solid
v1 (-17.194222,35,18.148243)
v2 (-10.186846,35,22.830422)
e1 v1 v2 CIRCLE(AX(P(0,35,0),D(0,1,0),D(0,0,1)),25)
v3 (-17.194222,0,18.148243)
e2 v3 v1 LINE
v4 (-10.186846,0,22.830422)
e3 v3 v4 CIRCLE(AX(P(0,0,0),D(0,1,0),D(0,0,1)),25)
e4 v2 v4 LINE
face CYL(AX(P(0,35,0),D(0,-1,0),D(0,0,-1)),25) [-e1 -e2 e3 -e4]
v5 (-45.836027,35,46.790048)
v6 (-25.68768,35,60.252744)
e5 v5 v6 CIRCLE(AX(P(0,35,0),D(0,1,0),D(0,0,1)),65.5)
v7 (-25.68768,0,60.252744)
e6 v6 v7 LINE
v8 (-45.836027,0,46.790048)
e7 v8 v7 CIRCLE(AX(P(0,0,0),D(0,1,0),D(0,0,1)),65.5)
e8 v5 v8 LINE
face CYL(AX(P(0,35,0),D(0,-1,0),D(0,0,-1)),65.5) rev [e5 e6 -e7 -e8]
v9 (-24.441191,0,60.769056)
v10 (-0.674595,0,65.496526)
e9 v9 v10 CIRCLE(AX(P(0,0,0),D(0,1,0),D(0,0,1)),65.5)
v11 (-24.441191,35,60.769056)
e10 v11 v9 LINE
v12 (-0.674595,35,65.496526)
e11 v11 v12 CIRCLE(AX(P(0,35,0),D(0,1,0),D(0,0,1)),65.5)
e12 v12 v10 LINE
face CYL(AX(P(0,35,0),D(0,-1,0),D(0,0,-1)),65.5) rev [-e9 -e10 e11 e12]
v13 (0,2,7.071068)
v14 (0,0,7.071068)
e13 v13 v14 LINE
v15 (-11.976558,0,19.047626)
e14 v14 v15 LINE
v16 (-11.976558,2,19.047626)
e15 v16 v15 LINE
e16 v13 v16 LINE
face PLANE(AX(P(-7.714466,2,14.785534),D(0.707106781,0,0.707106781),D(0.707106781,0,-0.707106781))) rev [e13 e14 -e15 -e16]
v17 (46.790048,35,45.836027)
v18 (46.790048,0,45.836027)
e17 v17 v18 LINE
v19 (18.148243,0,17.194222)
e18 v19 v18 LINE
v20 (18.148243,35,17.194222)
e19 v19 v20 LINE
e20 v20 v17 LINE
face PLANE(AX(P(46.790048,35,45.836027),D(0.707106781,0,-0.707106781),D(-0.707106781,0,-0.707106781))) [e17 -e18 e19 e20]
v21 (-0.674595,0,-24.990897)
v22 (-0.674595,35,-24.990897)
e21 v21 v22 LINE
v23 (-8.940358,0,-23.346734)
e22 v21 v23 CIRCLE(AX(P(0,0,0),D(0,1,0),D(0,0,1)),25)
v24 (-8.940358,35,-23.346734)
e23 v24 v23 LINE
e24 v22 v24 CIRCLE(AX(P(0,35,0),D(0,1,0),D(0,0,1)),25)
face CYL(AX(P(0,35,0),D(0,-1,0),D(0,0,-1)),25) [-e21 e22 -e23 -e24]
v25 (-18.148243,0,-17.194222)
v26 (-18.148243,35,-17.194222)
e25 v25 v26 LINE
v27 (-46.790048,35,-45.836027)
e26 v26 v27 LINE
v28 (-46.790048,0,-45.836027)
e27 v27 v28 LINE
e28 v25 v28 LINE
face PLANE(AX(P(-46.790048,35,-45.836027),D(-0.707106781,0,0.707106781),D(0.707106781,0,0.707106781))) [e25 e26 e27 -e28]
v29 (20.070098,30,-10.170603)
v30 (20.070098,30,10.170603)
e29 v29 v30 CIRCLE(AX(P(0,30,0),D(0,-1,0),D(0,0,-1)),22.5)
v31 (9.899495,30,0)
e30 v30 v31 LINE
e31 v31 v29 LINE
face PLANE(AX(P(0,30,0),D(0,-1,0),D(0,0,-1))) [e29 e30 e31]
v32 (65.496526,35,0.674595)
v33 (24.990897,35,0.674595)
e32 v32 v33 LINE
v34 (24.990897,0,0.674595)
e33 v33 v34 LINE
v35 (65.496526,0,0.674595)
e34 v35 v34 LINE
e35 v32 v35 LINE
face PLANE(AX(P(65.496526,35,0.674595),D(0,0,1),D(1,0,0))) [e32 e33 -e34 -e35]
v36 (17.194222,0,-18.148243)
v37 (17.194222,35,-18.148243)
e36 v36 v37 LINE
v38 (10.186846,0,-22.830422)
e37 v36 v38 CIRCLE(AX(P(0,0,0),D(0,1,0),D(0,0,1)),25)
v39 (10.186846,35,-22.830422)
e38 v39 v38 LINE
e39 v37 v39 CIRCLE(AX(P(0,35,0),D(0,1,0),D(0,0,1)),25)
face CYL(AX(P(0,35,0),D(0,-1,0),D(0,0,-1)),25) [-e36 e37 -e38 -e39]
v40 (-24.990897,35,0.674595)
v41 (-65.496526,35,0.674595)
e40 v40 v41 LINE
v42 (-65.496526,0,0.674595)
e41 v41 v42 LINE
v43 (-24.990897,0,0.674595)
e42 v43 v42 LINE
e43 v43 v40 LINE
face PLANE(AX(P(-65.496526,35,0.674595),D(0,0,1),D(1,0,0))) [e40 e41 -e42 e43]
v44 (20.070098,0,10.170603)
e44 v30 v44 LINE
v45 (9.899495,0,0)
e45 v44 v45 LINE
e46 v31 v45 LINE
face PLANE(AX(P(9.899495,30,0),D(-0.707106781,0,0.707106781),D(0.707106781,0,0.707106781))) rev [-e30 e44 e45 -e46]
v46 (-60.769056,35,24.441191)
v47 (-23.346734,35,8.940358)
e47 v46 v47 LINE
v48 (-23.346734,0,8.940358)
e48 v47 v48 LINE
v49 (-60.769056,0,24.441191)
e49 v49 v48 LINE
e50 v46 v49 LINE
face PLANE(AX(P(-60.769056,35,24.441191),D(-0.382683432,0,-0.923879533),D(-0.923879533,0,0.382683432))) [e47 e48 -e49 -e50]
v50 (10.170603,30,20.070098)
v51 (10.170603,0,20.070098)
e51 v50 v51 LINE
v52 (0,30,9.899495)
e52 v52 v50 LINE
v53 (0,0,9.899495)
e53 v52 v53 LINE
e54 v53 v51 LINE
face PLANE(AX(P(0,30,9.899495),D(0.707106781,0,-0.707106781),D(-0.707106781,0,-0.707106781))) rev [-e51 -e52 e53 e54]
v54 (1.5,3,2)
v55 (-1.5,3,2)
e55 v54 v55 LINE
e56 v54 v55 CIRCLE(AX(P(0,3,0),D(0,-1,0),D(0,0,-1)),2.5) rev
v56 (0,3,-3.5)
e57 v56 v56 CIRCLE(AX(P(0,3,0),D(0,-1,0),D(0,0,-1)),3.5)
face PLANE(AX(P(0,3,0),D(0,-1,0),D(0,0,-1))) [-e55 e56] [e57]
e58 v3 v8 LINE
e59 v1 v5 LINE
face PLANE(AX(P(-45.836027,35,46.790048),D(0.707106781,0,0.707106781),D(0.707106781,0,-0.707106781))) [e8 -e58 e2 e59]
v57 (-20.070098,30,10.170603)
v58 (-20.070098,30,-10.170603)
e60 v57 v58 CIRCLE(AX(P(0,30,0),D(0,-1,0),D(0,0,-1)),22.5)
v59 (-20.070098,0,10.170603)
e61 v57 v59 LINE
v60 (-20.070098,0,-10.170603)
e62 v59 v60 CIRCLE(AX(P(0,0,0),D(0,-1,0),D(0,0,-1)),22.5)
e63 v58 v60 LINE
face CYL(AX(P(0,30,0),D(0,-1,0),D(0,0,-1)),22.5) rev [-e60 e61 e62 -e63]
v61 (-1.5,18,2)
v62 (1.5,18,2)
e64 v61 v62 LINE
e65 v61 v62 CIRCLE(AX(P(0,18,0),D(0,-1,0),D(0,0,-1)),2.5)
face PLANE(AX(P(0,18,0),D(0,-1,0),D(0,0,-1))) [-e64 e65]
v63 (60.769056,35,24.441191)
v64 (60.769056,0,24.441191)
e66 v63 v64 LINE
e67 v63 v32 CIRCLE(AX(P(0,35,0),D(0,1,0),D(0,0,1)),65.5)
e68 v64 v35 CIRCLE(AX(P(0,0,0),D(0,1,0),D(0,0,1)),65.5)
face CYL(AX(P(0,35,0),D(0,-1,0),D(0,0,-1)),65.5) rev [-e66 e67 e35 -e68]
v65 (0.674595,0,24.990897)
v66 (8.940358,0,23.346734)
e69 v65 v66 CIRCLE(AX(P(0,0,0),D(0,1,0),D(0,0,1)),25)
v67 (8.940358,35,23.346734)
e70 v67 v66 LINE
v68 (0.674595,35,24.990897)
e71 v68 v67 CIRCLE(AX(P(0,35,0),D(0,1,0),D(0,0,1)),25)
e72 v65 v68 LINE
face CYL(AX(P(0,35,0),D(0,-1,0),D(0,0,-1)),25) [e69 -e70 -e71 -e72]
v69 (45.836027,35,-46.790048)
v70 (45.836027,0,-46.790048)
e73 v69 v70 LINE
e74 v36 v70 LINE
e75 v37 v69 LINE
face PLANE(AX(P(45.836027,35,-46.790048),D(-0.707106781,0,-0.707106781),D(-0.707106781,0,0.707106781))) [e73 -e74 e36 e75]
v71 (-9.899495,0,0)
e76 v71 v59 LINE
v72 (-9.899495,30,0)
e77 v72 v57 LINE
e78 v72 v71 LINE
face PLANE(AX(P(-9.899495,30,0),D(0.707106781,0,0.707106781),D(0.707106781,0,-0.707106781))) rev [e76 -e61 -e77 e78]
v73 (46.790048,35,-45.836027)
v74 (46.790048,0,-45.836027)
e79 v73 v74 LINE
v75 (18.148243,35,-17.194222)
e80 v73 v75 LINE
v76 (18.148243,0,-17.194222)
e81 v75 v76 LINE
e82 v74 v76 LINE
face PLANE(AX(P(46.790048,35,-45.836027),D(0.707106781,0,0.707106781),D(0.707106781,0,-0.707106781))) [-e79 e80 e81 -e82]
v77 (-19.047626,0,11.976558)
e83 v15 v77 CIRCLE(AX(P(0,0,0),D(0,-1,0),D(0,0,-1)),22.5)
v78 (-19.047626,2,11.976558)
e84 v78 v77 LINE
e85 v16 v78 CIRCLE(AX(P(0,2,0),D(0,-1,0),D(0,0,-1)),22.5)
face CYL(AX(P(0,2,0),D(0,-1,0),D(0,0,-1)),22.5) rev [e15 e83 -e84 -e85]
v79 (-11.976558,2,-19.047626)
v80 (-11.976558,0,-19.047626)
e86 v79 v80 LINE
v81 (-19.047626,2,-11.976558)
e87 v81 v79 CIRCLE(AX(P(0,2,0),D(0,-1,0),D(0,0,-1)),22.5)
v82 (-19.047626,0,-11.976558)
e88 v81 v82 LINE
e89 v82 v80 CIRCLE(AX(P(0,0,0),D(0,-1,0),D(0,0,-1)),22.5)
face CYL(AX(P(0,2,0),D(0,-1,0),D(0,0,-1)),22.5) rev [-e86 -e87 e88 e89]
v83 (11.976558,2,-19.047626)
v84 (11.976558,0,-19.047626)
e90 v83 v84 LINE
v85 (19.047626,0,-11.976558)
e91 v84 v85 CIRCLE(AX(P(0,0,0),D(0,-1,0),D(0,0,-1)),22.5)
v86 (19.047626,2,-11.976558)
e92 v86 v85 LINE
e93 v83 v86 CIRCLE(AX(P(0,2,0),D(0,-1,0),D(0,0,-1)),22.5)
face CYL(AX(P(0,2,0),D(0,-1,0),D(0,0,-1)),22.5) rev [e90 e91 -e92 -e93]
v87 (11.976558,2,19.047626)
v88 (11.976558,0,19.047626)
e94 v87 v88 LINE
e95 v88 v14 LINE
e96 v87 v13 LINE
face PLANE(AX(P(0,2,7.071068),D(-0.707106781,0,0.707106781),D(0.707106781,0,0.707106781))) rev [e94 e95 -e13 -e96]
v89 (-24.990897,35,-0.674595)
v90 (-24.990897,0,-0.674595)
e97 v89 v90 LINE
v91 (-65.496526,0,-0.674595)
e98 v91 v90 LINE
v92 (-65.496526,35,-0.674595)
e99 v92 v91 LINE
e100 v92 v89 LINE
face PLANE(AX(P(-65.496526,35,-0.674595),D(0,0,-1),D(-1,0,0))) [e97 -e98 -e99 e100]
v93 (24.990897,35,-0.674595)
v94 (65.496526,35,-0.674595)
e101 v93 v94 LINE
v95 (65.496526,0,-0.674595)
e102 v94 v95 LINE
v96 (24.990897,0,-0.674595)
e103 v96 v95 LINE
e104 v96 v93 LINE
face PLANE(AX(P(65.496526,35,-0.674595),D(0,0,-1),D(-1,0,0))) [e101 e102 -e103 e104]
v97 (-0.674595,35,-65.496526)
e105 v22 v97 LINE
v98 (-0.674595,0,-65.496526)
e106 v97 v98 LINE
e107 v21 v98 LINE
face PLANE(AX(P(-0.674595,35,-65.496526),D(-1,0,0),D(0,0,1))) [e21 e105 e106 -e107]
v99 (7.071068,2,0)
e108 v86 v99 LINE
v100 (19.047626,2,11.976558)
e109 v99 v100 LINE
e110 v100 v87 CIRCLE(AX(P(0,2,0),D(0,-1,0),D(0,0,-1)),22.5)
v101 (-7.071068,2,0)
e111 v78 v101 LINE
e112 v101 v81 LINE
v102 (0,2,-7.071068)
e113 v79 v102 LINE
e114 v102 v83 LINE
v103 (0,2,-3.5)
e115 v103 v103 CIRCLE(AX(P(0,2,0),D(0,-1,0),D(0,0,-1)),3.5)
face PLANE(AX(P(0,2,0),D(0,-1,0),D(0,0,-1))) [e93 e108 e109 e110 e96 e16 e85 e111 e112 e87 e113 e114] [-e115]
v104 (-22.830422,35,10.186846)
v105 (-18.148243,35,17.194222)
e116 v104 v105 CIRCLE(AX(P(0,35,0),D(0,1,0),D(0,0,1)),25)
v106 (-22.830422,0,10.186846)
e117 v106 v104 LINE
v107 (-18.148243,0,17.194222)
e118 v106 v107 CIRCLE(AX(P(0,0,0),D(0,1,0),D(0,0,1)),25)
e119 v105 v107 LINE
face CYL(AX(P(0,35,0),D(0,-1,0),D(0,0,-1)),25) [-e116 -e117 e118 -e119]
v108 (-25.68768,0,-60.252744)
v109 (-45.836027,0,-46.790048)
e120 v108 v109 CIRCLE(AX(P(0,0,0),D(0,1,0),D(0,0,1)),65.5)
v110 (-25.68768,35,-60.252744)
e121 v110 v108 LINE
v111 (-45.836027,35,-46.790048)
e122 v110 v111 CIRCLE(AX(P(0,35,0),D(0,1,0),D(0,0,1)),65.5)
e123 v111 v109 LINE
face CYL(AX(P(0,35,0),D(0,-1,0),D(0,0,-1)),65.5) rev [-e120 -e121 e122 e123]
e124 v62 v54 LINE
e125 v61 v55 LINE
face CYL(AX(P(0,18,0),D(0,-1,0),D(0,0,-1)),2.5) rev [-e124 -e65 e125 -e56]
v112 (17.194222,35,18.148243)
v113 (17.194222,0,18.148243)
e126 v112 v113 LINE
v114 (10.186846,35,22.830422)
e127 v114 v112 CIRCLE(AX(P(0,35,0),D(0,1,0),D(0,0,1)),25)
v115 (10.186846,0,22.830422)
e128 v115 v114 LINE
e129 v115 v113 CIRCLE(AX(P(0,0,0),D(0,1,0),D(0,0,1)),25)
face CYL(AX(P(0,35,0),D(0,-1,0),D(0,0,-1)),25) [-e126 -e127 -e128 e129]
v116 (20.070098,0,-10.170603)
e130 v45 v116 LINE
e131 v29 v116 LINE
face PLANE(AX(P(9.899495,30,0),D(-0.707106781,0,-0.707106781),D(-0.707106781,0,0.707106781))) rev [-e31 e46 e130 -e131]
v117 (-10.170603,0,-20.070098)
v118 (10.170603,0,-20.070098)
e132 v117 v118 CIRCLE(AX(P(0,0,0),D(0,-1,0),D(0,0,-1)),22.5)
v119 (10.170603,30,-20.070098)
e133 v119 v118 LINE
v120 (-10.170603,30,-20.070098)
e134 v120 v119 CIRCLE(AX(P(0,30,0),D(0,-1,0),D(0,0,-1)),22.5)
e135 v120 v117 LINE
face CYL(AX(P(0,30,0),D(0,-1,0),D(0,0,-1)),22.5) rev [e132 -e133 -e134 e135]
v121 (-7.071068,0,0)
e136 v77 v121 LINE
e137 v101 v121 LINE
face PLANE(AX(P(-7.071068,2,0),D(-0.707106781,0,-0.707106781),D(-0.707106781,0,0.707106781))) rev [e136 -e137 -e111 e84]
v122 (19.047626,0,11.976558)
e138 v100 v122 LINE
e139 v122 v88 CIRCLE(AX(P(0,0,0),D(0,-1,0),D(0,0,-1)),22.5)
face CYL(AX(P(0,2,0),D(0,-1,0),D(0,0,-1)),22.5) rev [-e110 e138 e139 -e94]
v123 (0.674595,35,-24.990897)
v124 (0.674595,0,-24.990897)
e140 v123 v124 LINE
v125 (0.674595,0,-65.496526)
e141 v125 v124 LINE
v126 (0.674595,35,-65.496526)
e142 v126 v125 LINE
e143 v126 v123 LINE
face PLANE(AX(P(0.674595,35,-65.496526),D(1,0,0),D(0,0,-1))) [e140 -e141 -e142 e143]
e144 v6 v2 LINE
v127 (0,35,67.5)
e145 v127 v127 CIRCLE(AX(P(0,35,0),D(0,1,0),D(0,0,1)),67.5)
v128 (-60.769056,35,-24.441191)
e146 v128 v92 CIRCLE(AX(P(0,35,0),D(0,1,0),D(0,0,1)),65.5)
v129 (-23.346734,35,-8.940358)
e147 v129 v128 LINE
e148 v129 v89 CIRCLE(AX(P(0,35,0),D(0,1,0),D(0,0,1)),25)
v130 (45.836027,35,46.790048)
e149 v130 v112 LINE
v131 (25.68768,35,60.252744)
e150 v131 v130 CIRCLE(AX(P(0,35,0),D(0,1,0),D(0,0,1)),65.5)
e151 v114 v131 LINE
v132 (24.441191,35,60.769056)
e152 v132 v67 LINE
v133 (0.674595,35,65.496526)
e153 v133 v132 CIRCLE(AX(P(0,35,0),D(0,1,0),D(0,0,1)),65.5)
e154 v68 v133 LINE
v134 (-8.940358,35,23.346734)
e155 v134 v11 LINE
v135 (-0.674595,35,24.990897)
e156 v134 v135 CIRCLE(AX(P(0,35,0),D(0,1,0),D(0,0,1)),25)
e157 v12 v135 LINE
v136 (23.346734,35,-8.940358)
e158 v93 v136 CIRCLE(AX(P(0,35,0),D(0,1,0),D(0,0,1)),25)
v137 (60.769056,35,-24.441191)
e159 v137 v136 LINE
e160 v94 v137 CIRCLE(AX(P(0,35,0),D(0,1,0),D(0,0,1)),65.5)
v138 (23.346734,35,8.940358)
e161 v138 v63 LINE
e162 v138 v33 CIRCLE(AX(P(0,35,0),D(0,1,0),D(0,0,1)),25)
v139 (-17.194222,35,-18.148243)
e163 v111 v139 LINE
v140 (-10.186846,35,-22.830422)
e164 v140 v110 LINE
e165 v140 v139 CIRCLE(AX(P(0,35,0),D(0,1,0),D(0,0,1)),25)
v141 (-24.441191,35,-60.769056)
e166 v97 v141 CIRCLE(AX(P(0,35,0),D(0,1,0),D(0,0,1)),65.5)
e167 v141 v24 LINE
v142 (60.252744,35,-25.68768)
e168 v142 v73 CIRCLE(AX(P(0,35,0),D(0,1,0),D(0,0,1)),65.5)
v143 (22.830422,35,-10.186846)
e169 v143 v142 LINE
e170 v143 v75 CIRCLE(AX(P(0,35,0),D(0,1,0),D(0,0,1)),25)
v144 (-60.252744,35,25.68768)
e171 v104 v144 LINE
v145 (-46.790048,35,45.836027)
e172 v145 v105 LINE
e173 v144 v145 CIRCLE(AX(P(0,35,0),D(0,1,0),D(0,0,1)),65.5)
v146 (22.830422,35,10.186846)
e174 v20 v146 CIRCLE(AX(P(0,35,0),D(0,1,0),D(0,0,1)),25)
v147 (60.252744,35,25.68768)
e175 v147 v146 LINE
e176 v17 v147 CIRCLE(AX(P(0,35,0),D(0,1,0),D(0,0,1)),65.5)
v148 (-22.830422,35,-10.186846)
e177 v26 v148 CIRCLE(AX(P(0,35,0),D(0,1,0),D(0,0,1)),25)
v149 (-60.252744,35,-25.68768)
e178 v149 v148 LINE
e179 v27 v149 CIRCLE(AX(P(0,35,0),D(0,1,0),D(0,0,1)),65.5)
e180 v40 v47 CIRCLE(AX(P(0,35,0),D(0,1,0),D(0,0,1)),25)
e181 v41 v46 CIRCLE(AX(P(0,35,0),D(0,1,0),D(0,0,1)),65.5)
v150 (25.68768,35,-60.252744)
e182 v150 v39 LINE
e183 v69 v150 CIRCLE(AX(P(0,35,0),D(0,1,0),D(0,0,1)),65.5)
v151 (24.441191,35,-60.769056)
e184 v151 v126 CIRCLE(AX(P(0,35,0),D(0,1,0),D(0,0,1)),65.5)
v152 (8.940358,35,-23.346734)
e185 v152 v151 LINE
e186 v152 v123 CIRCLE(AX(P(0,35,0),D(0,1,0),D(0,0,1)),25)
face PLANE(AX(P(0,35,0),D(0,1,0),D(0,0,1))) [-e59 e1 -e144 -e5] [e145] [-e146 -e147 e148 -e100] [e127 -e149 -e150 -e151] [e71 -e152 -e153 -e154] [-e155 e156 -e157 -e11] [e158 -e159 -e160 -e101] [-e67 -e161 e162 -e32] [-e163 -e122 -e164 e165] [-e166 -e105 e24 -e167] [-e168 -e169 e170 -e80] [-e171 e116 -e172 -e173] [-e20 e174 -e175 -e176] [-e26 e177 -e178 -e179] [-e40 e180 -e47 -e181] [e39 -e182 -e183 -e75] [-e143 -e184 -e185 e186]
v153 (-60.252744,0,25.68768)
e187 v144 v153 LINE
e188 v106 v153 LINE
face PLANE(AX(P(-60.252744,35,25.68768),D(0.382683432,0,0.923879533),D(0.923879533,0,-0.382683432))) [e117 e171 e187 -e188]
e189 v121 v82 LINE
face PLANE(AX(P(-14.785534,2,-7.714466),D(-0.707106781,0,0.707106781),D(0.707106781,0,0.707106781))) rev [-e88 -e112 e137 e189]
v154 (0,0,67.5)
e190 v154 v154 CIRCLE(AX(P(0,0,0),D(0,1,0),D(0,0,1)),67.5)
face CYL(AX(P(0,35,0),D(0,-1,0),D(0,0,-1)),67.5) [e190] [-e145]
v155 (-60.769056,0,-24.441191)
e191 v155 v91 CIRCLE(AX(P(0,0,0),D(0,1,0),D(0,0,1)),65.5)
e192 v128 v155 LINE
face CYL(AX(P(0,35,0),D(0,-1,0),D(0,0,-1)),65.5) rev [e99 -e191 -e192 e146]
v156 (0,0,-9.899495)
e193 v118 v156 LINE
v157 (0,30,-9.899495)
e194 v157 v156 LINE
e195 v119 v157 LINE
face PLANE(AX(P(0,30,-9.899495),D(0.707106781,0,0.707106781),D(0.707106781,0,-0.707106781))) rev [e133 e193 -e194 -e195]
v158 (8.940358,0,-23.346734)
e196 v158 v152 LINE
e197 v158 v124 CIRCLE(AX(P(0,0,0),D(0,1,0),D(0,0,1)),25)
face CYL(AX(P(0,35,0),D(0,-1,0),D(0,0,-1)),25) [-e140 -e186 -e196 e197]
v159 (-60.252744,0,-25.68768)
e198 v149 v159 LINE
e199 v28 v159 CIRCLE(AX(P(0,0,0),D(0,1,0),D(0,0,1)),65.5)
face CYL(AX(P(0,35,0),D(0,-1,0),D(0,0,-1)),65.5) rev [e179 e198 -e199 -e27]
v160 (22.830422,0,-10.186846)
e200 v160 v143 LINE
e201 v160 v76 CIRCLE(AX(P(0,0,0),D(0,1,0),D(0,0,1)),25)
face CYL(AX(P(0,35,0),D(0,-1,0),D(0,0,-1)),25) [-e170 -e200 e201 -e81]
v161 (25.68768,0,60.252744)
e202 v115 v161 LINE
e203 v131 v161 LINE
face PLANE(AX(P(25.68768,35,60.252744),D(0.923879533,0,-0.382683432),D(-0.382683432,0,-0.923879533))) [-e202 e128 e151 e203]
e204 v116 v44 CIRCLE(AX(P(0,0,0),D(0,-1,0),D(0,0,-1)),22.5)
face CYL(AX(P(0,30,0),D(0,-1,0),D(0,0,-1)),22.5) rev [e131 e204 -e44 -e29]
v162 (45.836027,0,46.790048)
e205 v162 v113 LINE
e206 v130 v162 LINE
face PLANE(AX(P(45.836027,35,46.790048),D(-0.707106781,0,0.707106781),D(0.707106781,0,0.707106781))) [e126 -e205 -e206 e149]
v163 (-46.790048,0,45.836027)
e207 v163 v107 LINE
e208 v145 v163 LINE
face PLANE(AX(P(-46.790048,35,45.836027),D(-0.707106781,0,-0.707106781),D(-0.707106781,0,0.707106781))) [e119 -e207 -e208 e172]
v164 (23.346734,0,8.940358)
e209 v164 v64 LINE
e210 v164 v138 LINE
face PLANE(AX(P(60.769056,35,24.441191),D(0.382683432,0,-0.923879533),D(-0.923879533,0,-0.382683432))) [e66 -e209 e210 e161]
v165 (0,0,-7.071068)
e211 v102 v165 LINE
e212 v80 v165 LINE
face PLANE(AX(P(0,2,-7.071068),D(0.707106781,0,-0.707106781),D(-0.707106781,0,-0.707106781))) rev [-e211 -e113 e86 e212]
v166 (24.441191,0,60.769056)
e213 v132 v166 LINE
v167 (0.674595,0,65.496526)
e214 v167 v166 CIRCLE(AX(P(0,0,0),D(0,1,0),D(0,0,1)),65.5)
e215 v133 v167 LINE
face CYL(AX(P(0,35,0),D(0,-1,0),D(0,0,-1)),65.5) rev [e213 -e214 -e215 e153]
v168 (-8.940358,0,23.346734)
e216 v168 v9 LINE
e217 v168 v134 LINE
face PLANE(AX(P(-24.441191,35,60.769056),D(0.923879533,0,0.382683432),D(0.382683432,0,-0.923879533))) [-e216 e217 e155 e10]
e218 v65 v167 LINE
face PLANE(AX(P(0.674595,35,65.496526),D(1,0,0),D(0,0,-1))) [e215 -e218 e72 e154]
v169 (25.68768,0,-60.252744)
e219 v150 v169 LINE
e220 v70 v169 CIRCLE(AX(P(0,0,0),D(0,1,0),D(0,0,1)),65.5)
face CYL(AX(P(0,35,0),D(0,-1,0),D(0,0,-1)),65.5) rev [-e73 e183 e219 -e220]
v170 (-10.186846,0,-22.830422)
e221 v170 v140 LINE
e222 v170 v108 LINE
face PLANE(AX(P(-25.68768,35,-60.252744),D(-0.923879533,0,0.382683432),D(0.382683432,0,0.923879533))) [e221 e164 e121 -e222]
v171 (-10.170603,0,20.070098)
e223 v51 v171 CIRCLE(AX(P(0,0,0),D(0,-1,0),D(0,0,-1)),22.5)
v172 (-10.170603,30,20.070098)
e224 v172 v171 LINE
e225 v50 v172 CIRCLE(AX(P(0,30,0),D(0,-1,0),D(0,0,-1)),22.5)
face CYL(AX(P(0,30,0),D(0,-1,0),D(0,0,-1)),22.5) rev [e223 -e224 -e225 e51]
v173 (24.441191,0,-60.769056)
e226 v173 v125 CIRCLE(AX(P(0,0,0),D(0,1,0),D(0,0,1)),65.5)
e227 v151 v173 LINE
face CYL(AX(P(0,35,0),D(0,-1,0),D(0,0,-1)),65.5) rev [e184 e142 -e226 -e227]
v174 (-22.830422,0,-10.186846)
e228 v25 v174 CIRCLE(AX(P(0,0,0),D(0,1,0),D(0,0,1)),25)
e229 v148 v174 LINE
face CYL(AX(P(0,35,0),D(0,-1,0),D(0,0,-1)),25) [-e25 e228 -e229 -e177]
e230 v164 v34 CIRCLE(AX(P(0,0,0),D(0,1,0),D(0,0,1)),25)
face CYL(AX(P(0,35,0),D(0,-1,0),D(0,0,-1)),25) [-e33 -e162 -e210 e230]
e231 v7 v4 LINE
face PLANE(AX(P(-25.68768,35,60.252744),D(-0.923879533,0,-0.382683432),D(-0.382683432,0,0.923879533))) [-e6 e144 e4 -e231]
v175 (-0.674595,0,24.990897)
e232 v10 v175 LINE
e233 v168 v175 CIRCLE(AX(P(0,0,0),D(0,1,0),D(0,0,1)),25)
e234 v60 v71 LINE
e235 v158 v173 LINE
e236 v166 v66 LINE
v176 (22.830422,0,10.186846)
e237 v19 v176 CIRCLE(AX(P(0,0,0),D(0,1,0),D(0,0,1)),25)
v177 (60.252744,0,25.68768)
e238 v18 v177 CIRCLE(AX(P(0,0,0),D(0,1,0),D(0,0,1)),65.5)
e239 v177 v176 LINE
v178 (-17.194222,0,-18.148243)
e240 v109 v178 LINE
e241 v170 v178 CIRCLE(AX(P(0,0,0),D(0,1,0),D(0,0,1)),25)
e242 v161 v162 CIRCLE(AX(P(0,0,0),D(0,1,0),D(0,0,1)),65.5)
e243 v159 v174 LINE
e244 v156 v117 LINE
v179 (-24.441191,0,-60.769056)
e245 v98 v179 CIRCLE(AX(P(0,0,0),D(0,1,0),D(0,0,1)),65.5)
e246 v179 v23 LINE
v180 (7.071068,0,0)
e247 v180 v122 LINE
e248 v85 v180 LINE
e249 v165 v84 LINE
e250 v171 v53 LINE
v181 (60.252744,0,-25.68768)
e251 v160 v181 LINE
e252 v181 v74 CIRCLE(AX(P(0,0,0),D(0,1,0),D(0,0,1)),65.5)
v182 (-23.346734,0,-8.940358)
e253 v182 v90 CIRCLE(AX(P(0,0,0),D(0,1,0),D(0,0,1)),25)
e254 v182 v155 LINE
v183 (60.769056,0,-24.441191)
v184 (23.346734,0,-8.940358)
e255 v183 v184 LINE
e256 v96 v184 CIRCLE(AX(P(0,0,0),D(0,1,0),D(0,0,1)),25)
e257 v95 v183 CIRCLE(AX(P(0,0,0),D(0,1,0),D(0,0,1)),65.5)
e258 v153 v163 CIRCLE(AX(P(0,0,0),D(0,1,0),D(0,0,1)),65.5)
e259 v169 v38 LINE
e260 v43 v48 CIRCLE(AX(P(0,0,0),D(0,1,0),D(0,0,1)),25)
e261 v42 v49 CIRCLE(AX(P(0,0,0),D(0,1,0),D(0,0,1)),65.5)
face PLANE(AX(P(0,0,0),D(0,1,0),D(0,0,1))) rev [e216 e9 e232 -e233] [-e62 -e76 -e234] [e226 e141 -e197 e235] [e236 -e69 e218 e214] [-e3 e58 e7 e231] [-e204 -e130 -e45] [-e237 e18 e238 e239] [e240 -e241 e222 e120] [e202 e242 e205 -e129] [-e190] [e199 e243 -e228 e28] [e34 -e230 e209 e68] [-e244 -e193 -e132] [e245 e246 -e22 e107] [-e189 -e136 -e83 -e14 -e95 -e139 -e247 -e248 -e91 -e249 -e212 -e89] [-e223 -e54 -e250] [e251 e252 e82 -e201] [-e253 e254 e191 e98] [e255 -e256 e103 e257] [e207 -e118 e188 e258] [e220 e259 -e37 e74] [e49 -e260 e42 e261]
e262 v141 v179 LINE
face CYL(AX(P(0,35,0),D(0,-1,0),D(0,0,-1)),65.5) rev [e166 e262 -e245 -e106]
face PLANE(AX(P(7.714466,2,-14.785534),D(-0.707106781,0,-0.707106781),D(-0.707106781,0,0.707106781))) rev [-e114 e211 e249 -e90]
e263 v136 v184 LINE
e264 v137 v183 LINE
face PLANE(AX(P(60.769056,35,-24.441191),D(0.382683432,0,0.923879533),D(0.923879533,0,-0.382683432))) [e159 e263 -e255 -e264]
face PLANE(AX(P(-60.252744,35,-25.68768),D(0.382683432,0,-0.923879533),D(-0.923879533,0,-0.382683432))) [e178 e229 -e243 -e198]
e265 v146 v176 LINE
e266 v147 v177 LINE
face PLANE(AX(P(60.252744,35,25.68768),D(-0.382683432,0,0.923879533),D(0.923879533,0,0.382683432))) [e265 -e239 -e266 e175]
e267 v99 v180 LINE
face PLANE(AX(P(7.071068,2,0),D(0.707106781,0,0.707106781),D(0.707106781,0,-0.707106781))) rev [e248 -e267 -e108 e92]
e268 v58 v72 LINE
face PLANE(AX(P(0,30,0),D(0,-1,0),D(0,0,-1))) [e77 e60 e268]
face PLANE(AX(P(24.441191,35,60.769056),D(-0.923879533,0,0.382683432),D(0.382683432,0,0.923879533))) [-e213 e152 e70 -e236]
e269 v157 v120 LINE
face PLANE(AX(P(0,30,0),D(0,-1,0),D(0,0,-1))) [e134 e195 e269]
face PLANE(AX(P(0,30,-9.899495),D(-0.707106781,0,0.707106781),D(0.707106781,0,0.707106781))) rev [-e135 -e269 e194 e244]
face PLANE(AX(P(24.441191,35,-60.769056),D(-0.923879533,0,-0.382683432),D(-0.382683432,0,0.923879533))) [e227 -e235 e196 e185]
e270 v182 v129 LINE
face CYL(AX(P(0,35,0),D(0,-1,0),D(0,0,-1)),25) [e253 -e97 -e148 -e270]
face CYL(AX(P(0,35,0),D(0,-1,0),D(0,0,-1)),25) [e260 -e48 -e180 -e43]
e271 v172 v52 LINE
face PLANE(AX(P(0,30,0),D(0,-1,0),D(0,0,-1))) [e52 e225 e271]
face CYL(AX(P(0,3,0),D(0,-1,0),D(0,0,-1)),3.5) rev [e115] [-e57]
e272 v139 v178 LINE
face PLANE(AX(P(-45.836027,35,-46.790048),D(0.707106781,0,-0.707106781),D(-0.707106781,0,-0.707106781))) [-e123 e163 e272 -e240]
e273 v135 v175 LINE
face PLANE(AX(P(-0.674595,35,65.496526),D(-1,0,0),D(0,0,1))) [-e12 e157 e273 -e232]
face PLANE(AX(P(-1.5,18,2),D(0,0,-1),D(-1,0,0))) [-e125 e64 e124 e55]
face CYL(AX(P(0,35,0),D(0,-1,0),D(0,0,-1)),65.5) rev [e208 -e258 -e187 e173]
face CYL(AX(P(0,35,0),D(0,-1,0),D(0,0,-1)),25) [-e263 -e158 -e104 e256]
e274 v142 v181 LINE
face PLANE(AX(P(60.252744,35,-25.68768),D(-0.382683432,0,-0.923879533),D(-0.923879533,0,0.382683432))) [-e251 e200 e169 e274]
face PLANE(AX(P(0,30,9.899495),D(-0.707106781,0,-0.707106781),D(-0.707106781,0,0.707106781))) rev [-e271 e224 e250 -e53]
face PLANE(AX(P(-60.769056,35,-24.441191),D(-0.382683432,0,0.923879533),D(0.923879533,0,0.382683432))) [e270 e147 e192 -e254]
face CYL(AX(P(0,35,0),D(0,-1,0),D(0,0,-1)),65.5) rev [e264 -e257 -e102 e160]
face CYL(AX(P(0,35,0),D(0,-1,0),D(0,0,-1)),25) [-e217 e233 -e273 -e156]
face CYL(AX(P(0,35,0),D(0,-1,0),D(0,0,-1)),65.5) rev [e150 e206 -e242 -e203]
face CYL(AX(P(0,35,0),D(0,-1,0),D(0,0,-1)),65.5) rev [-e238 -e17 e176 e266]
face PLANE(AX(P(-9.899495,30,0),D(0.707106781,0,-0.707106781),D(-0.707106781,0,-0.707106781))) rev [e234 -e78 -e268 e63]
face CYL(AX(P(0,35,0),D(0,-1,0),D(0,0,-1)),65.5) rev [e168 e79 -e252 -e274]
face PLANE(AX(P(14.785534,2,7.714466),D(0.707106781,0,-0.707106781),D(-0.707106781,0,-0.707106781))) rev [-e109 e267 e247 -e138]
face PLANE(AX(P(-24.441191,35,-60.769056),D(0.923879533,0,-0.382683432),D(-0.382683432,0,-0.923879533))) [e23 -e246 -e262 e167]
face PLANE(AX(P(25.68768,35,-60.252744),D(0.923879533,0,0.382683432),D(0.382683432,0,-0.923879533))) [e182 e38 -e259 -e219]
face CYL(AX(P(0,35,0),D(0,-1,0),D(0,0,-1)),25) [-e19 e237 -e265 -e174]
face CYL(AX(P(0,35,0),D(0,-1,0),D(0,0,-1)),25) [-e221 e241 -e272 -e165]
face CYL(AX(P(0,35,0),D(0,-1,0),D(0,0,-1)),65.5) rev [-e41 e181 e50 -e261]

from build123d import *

# Parameters (mm, degrees)
BOSS_EXTRUDE1_OUTLINE_R = 67.5
BOSS_EXTRUDE1_DEPTH     = 35
SKETCH2_R               = 2.5
CUT_EXTRUDE2_DEPTH      = 18
SKETCH4_R               = 25
BOSS_EXTRUDE3_DEPTH     = 35
CUT_EXTRUDE4_DEPTH      = 18
CUT_EXTRUDE7_DEPTH      = 2
CUT_EXTRUDE8_DEPTH      = 30
SKETCH9_R               = 3.5
CUT_EXTRUDE9_DEPTH      = 1


# Read off the part's stored shape, not the designer's step: Boss-Extrude1
with BuildPart() as part:
    # Boss-Extrude1 outline → Boss-Extrude1 (new body)
    with BuildSketch(Plane(origin=(0, 0, 0), x_dir=(1, 0, 0), z_dir=(0, 1, 0))):
        Circle(BOSS_EXTRUDE1_OUTLINE_R)
        with BuildLine():
            ThreePointArc((-13.30331837, -14.257339175), (-10.833619544, -16.21365744), (-8.081104316, -17.746711048))
            Line((-8.081104316, -17.746711048), (-25.687679516, -60.252743681))
            ThreePointArc((-25.687679516, -60.252743681), (-36.389850263, -54.461259606), (-45.836027298, -46.790048103))
            Line((-45.836027298, -46.790048103), (-13.30331837, -14.257339175))
        make_face(mode=Mode.SUBTRACT)
        with BuildLine():
            ThreePointArc((-6.834616064, -18.263023388), (-3.804261279, -19.125312968), (-0.674594581, -19.488327844))
            Line((-0.674594581, -19.488327844), (-0.674594581, -65.496526031))
            ThreePointArc((-0.674594581, -65.496526031), (-12.778416092, -64.241435866), (-24.441191264, -60.76905602))
            Line((-24.441191264, -60.76905602), (-6.834616064, -18.263023388))
        make_face(mode=Mode.SUBTRACT)
        with BuildLine():
            ThreePointArc((-17.746711048, -8.081104316), (-16.21365744, -10.833619544), (-14.257339175, -13.30331837))
            Line((-14.257339175, -13.30331837), (-46.790048103, -45.836027298))
            ThreePointArc((-46.790048103, -45.836027298), (-54.461259606, -36.389850263), (-60.252743681, -25.687679516))
            Line((-60.252743681, -25.687679516), (-17.746711048, -8.081104316))
        make_face(mode=Mode.SUBTRACT)
        with BuildLine():
            ThreePointArc((-19.488327844, -0.674594581), (-19.125312968, -3.804261279), (-18.263023388, -6.834616064))
            Line((-18.263023388, -6.834616064), (-60.76905602, -24.441191264))
            ThreePointArc((-60.76905602, -24.441191264), (-64.241435866, -12.778416092), (-65.496526031, -0.674594581))
            Line((-65.496526031, -0.674594581), (-19.488327844, -0.674594581))
        make_face(mode=Mode.SUBTRACT)
        with BuildLine():
            ThreePointArc((0.674594581, -19.488327844), (3.804261279, -19.125312968), (6.834616064, -18.263023388))
            Line((6.834616064, -18.263023388), (24.441191264, -60.76905602))
            ThreePointArc((24.441191264, -60.76905602), (12.778416092, -64.241435866), (0.674594581, -65.496526031))
            Line((0.674594581, -65.496526031), (0.674594581, -19.488327844))
        make_face(mode=Mode.SUBTRACT)
        with BuildLine():
            ThreePointArc((8.081104316, -17.746711048), (10.833619544, -16.21365744), (13.30331837, -14.257339175))
            Line((13.30331837, -14.257339175), (45.836027298, -46.790048103))
            ThreePointArc((45.836027298, -46.790048103), (36.389850263, -54.461259606), (25.687679516, -60.252743681))
            Line((25.687679516, -60.252743681), (8.081104316, -17.746711048))
        make_face(mode=Mode.SUBTRACT)
        with BuildLine():
            ThreePointArc((14.257339175, -13.30331837), (16.21365744, -10.833619544), (17.746711048, -8.081104316))
            Line((17.746711048, -8.081104316), (60.252743681, -25.687679516))
            ThreePointArc((60.252743681, -25.687679516), (54.461259606, -36.389850263), (46.790048103, -45.836027298))
            Line((46.790048103, -45.836027298), (14.257339175, -13.30331837))
        make_face(mode=Mode.SUBTRACT)
        with BuildLine():
            ThreePointArc((18.263023388, -6.834616064), (19.125312968, -3.804261279), (19.488327844, -0.674594581))
            Line((19.488327844, -0.674594581), (65.496526031, -0.674594581))
            ThreePointArc((65.496526031, -0.674594581), (64.241435866, -12.778416092), (60.76905602, -24.441191264))
            Line((60.76905602, -24.441191264), (18.263023388, -6.834616064))
        make_face(mode=Mode.SUBTRACT)
        with BuildLine():
            ThreePointArc((-18.263023388, 6.834616064), (-19.125312968, 3.804261279), (-19.488327844, 0.674594581))
            Line((-19.488327844, 0.674594581), (-65.496526031, 0.674594581))
            ThreePointArc((-65.496526031, 0.674594581), (-64.241435866, 12.778416092), (-60.76905602, 24.441191264))
            Line((-60.76905602, 24.441191264), (-18.263023388, 6.834616064))
        make_face(mode=Mode.SUBTRACT)
        with BuildLine():
            ThreePointArc((-14.257339175, 13.30331837), (-16.21365744, 10.833619544), (-17.746711048, 8.081104316))
            Line((-17.746711048, 8.081104316), (-60.252743681, 25.687679516))
            ThreePointArc((-60.252743681, 25.687679516), (-54.461259606, 36.389850263), (-46.790048103, 45.836027298))
            Line((-46.790048103, 45.836027298), (-14.257339175, 13.30331837))
        make_face(mode=Mode.SUBTRACT)
        with BuildLine():
            ThreePointArc((-8.081104316, 17.746711048), (-10.833619544, 16.21365744), (-13.30331837, 14.257339175))
            Line((-13.30331837, 14.257339175), (-45.836027298, 46.790048103))
            ThreePointArc((-45.836027298, 46.790048103), (-36.389850263, 54.461259606), (-25.687679516, 60.252743681))
            Line((-25.687679516, 60.252743681), (-8.081104316, 17.746711048))
        make_face(mode=Mode.SUBTRACT)
        with BuildLine():
            Line((-6.834616064, 18.263023388), (-24.441191264, 60.76905602))
            ThreePointArc((-24.441191264, 60.76905602), (-12.778416092, 64.241435866), (-0.674594581, 65.496526031))
            Line((-0.674594581, 65.496526031), (-0.674594581, 19.488327844))
            ThreePointArc((-0.674594581, 19.488327844), (-3.804261279, 19.125312968), (-6.834616064, 18.263023388))
        make_face(mode=Mode.SUBTRACT)
        with BuildLine():
            ThreePointArc((19.488327844, 0.674594581), (19.125312968, 3.804261279), (18.263023388, 6.834616064))
            Line((18.263023388, 6.834616064), (60.76905602, 24.441191264))
            ThreePointArc((60.76905602, 24.441191264), (64.241435866, 12.778416092), (65.496526031, 0.674594581))
            Line((65.496526031, 0.674594581), (19.488327844, 0.674594581))
        make_face(mode=Mode.SUBTRACT)
        with BuildLine():
            ThreePointArc((17.746711048, 8.081104316), (16.21365744, 10.833619544), (14.257339175, 13.30331837))
            Line((14.257339175, 13.30331837), (46.790048103, 45.836027298))
            ThreePointArc((46.790048103, 45.836027298), (54.461259606, 36.389850263), (60.252743681, 25.687679516))
            Line((60.252743681, 25.687679516), (17.746711048, 8.081104316))
        make_face(mode=Mode.SUBTRACT)
        with BuildLine():
            ThreePointArc((6.834616064, 18.263023388), (3.804261279, 19.125312968), (0.674594581, 19.488327844))
            Line((0.674594581, 19.488327844), (0.674594581, 65.496526031))
            ThreePointArc((0.674594581, 65.496526031), (12.778416092, 64.241435866), (24.441191264, 60.76905602))
            Line((24.441191264, 60.76905602), (6.834616064, 18.263023388))
        make_face(mode=Mode.SUBTRACT)
        with BuildLine():
            ThreePointArc((13.30331837, 14.257339175), (10.833619544, 16.21365744), (8.081104316, 17.746711048))
            Line((8.081104316, 17.746711048), (25.687679516, 60.252743681))
            ThreePointArc((25.687679516, 60.252743681), (36.389850263, 54.461259606), (45.836027298, 46.790048103))
            Line((45.836027298, 46.790048103), (13.30331837, 14.257339175))
        make_face(mode=Mode.SUBTRACT)
    extrude(amount=BOSS_EXTRUDE1_DEPTH)

    # Sketch2 → Cut-Extrude2 (cut)
    with BuildSketch(Plane.XZ):
        with Locations(Location((0, 0, 0), (0, 0, 270))):
            Circle(SKETCH2_R)
    extrude(amount=-CUT_EXTRUDE2_DEPTH, mode=Mode.SUBTRACT)

    # Sketch4 → Boss-Extrude3 (add)
    with BuildSketch(Plane(origin=(0, 0, 0), x_dir=(1, 0, 0), z_dir=(0, 1, 0))):
        Circle(SKETCH4_R)
    extrude(amount=BOSS_EXTRUDE3_DEPTH)

    # Sketch5 → Cut-Extrude4 (cut)
    with BuildSketch(Plane.XZ):
        with BuildLine():
            Line((-1.5, 2), (1.5, 2))
            ThreePointArc((1.5, 2), (0, -2.5), (-1.5, 2))
        make_face()
    extrude(amount=-CUT_EXTRUDE4_DEPTH, mode=Mode.SUBTRACT)

    # Sketch6 → Cut-Extrude7 (cut)
    with BuildSketch(Plane.XZ):
        with BuildLine():
            Line((-7.714466094, 14.785533906), (0, 7.071067812))
            Line((0, 7.071067812), (7.714466094, 14.785533906))
            Line((7.714466094, 14.785533906), (11.976558152, 19.047625963))
            ThreePointArc((11.976558152, 19.047625963), (15.909902577, 15.909902577), (19.047625963, 11.976558152))
            Line((19.047625963, 11.976558152), (14.785533906, 7.714466094))
            Line((14.785533906, 7.714466094), (7.071067812, 0))
            Line((7.071067812, 0), (14.785533906, -7.714466094))
            Line((14.785533906, -7.714466094), (19.047625963, -11.976558152))
            ThreePointArc((19.047625963, -11.976558152), (15.909902577, -15.909902577), (11.976558152, -19.047625963))
            Line((11.976558152, -19.047625963), (7.714466094, -14.785533906))
            Line((7.714466094, -14.785533906), (0, -7.071067812))
            Line((0, -7.071067812), (-7.714466094, -14.785533906))
            Line((-7.714466094, -14.785533906), (-11.976558152, -19.047625963))
            ThreePointArc((-11.976558152, -19.047625963), (-15.909902577, -15.909902577), (-19.047625963, -11.976558152))
            Line((-19.047625963, -11.976558152), (-14.785533906, -7.714466094))
            Line((-14.785533906, -7.714466094), (-7.071067812, 0))
            Line((-7.071067812, 0), (-14.785533906, 7.714466094))
            Line((-14.785533906, 7.714466094), (-19.047625963, 11.976558152))
            ThreePointArc((-19.047625963, 11.976558152), (-15.909902577, 15.909902577), (-11.976558152, 19.047625963))
            Line((-11.976558152, 19.047625963), (-7.714466094, 14.785533906))
        make_face()
    extrude(amount=-CUT_EXTRUDE7_DEPTH, mode=Mode.SUBTRACT)

    # Sketch7 → Cut-Extrude8 (cut)
    with BuildSketch(Plane.XZ):
        with BuildLine():
            Line((9.899494937, 0), (20.070097993, 10.170603057))
            ThreePointArc((20.070097993, 10.170603057), (22.5, 0), (20.070097993, -10.170603057))
            Line((20.070097993, -10.170603057), (9.899494937, 0))
        make_face()
        with BuildLine():
            Line((0, 9.899494937), (-10.170603057, 20.070097993))
            ThreePointArc((-10.170603057, 20.070097993), (0, 22.5), (10.170603057, 20.070097993))
            Line((10.170603057, 20.070097993), (0, 9.899494937))
        make_face()
        with BuildLine():
            Line((0, -9.899494937), (10.170603057, -20.070097993))
            ThreePointArc((10.170603057, -20.070097993), (0, -22.5), (-10.170603057, -20.070097993))
            Line((-10.170603057, -20.070097993), (0, -9.899494937))
        make_face()
        with BuildLine():
            Line((-9.899494937, 0), (-20.070097993, -10.170603057))
            ThreePointArc((-20.070097993, -10.170603057), (-22.5, 0), (-20.070097993, 10.170603057))
            Line((-20.070097993, 10.170603057), (-9.899494937, 0))
        make_face()
    extrude(amount=-CUT_EXTRUDE8_DEPTH, mode=Mode.SUBTRACT)

    # Sketch9 → Cut-Extrude9 (cut)
    with BuildSketch(Plane(origin=(0, 2, 0), x_dir=(-1, 0, 0), z_dir=(0, -1, 0))):
        with Locations(Location((0, 0, 0), (0, 0, 90))):
            Circle(SKETCH9_R)
    extrude(amount=-CUT_EXTRUDE9_DEPTH, mode=Mode.SUBTRACT)


solid = part.part
